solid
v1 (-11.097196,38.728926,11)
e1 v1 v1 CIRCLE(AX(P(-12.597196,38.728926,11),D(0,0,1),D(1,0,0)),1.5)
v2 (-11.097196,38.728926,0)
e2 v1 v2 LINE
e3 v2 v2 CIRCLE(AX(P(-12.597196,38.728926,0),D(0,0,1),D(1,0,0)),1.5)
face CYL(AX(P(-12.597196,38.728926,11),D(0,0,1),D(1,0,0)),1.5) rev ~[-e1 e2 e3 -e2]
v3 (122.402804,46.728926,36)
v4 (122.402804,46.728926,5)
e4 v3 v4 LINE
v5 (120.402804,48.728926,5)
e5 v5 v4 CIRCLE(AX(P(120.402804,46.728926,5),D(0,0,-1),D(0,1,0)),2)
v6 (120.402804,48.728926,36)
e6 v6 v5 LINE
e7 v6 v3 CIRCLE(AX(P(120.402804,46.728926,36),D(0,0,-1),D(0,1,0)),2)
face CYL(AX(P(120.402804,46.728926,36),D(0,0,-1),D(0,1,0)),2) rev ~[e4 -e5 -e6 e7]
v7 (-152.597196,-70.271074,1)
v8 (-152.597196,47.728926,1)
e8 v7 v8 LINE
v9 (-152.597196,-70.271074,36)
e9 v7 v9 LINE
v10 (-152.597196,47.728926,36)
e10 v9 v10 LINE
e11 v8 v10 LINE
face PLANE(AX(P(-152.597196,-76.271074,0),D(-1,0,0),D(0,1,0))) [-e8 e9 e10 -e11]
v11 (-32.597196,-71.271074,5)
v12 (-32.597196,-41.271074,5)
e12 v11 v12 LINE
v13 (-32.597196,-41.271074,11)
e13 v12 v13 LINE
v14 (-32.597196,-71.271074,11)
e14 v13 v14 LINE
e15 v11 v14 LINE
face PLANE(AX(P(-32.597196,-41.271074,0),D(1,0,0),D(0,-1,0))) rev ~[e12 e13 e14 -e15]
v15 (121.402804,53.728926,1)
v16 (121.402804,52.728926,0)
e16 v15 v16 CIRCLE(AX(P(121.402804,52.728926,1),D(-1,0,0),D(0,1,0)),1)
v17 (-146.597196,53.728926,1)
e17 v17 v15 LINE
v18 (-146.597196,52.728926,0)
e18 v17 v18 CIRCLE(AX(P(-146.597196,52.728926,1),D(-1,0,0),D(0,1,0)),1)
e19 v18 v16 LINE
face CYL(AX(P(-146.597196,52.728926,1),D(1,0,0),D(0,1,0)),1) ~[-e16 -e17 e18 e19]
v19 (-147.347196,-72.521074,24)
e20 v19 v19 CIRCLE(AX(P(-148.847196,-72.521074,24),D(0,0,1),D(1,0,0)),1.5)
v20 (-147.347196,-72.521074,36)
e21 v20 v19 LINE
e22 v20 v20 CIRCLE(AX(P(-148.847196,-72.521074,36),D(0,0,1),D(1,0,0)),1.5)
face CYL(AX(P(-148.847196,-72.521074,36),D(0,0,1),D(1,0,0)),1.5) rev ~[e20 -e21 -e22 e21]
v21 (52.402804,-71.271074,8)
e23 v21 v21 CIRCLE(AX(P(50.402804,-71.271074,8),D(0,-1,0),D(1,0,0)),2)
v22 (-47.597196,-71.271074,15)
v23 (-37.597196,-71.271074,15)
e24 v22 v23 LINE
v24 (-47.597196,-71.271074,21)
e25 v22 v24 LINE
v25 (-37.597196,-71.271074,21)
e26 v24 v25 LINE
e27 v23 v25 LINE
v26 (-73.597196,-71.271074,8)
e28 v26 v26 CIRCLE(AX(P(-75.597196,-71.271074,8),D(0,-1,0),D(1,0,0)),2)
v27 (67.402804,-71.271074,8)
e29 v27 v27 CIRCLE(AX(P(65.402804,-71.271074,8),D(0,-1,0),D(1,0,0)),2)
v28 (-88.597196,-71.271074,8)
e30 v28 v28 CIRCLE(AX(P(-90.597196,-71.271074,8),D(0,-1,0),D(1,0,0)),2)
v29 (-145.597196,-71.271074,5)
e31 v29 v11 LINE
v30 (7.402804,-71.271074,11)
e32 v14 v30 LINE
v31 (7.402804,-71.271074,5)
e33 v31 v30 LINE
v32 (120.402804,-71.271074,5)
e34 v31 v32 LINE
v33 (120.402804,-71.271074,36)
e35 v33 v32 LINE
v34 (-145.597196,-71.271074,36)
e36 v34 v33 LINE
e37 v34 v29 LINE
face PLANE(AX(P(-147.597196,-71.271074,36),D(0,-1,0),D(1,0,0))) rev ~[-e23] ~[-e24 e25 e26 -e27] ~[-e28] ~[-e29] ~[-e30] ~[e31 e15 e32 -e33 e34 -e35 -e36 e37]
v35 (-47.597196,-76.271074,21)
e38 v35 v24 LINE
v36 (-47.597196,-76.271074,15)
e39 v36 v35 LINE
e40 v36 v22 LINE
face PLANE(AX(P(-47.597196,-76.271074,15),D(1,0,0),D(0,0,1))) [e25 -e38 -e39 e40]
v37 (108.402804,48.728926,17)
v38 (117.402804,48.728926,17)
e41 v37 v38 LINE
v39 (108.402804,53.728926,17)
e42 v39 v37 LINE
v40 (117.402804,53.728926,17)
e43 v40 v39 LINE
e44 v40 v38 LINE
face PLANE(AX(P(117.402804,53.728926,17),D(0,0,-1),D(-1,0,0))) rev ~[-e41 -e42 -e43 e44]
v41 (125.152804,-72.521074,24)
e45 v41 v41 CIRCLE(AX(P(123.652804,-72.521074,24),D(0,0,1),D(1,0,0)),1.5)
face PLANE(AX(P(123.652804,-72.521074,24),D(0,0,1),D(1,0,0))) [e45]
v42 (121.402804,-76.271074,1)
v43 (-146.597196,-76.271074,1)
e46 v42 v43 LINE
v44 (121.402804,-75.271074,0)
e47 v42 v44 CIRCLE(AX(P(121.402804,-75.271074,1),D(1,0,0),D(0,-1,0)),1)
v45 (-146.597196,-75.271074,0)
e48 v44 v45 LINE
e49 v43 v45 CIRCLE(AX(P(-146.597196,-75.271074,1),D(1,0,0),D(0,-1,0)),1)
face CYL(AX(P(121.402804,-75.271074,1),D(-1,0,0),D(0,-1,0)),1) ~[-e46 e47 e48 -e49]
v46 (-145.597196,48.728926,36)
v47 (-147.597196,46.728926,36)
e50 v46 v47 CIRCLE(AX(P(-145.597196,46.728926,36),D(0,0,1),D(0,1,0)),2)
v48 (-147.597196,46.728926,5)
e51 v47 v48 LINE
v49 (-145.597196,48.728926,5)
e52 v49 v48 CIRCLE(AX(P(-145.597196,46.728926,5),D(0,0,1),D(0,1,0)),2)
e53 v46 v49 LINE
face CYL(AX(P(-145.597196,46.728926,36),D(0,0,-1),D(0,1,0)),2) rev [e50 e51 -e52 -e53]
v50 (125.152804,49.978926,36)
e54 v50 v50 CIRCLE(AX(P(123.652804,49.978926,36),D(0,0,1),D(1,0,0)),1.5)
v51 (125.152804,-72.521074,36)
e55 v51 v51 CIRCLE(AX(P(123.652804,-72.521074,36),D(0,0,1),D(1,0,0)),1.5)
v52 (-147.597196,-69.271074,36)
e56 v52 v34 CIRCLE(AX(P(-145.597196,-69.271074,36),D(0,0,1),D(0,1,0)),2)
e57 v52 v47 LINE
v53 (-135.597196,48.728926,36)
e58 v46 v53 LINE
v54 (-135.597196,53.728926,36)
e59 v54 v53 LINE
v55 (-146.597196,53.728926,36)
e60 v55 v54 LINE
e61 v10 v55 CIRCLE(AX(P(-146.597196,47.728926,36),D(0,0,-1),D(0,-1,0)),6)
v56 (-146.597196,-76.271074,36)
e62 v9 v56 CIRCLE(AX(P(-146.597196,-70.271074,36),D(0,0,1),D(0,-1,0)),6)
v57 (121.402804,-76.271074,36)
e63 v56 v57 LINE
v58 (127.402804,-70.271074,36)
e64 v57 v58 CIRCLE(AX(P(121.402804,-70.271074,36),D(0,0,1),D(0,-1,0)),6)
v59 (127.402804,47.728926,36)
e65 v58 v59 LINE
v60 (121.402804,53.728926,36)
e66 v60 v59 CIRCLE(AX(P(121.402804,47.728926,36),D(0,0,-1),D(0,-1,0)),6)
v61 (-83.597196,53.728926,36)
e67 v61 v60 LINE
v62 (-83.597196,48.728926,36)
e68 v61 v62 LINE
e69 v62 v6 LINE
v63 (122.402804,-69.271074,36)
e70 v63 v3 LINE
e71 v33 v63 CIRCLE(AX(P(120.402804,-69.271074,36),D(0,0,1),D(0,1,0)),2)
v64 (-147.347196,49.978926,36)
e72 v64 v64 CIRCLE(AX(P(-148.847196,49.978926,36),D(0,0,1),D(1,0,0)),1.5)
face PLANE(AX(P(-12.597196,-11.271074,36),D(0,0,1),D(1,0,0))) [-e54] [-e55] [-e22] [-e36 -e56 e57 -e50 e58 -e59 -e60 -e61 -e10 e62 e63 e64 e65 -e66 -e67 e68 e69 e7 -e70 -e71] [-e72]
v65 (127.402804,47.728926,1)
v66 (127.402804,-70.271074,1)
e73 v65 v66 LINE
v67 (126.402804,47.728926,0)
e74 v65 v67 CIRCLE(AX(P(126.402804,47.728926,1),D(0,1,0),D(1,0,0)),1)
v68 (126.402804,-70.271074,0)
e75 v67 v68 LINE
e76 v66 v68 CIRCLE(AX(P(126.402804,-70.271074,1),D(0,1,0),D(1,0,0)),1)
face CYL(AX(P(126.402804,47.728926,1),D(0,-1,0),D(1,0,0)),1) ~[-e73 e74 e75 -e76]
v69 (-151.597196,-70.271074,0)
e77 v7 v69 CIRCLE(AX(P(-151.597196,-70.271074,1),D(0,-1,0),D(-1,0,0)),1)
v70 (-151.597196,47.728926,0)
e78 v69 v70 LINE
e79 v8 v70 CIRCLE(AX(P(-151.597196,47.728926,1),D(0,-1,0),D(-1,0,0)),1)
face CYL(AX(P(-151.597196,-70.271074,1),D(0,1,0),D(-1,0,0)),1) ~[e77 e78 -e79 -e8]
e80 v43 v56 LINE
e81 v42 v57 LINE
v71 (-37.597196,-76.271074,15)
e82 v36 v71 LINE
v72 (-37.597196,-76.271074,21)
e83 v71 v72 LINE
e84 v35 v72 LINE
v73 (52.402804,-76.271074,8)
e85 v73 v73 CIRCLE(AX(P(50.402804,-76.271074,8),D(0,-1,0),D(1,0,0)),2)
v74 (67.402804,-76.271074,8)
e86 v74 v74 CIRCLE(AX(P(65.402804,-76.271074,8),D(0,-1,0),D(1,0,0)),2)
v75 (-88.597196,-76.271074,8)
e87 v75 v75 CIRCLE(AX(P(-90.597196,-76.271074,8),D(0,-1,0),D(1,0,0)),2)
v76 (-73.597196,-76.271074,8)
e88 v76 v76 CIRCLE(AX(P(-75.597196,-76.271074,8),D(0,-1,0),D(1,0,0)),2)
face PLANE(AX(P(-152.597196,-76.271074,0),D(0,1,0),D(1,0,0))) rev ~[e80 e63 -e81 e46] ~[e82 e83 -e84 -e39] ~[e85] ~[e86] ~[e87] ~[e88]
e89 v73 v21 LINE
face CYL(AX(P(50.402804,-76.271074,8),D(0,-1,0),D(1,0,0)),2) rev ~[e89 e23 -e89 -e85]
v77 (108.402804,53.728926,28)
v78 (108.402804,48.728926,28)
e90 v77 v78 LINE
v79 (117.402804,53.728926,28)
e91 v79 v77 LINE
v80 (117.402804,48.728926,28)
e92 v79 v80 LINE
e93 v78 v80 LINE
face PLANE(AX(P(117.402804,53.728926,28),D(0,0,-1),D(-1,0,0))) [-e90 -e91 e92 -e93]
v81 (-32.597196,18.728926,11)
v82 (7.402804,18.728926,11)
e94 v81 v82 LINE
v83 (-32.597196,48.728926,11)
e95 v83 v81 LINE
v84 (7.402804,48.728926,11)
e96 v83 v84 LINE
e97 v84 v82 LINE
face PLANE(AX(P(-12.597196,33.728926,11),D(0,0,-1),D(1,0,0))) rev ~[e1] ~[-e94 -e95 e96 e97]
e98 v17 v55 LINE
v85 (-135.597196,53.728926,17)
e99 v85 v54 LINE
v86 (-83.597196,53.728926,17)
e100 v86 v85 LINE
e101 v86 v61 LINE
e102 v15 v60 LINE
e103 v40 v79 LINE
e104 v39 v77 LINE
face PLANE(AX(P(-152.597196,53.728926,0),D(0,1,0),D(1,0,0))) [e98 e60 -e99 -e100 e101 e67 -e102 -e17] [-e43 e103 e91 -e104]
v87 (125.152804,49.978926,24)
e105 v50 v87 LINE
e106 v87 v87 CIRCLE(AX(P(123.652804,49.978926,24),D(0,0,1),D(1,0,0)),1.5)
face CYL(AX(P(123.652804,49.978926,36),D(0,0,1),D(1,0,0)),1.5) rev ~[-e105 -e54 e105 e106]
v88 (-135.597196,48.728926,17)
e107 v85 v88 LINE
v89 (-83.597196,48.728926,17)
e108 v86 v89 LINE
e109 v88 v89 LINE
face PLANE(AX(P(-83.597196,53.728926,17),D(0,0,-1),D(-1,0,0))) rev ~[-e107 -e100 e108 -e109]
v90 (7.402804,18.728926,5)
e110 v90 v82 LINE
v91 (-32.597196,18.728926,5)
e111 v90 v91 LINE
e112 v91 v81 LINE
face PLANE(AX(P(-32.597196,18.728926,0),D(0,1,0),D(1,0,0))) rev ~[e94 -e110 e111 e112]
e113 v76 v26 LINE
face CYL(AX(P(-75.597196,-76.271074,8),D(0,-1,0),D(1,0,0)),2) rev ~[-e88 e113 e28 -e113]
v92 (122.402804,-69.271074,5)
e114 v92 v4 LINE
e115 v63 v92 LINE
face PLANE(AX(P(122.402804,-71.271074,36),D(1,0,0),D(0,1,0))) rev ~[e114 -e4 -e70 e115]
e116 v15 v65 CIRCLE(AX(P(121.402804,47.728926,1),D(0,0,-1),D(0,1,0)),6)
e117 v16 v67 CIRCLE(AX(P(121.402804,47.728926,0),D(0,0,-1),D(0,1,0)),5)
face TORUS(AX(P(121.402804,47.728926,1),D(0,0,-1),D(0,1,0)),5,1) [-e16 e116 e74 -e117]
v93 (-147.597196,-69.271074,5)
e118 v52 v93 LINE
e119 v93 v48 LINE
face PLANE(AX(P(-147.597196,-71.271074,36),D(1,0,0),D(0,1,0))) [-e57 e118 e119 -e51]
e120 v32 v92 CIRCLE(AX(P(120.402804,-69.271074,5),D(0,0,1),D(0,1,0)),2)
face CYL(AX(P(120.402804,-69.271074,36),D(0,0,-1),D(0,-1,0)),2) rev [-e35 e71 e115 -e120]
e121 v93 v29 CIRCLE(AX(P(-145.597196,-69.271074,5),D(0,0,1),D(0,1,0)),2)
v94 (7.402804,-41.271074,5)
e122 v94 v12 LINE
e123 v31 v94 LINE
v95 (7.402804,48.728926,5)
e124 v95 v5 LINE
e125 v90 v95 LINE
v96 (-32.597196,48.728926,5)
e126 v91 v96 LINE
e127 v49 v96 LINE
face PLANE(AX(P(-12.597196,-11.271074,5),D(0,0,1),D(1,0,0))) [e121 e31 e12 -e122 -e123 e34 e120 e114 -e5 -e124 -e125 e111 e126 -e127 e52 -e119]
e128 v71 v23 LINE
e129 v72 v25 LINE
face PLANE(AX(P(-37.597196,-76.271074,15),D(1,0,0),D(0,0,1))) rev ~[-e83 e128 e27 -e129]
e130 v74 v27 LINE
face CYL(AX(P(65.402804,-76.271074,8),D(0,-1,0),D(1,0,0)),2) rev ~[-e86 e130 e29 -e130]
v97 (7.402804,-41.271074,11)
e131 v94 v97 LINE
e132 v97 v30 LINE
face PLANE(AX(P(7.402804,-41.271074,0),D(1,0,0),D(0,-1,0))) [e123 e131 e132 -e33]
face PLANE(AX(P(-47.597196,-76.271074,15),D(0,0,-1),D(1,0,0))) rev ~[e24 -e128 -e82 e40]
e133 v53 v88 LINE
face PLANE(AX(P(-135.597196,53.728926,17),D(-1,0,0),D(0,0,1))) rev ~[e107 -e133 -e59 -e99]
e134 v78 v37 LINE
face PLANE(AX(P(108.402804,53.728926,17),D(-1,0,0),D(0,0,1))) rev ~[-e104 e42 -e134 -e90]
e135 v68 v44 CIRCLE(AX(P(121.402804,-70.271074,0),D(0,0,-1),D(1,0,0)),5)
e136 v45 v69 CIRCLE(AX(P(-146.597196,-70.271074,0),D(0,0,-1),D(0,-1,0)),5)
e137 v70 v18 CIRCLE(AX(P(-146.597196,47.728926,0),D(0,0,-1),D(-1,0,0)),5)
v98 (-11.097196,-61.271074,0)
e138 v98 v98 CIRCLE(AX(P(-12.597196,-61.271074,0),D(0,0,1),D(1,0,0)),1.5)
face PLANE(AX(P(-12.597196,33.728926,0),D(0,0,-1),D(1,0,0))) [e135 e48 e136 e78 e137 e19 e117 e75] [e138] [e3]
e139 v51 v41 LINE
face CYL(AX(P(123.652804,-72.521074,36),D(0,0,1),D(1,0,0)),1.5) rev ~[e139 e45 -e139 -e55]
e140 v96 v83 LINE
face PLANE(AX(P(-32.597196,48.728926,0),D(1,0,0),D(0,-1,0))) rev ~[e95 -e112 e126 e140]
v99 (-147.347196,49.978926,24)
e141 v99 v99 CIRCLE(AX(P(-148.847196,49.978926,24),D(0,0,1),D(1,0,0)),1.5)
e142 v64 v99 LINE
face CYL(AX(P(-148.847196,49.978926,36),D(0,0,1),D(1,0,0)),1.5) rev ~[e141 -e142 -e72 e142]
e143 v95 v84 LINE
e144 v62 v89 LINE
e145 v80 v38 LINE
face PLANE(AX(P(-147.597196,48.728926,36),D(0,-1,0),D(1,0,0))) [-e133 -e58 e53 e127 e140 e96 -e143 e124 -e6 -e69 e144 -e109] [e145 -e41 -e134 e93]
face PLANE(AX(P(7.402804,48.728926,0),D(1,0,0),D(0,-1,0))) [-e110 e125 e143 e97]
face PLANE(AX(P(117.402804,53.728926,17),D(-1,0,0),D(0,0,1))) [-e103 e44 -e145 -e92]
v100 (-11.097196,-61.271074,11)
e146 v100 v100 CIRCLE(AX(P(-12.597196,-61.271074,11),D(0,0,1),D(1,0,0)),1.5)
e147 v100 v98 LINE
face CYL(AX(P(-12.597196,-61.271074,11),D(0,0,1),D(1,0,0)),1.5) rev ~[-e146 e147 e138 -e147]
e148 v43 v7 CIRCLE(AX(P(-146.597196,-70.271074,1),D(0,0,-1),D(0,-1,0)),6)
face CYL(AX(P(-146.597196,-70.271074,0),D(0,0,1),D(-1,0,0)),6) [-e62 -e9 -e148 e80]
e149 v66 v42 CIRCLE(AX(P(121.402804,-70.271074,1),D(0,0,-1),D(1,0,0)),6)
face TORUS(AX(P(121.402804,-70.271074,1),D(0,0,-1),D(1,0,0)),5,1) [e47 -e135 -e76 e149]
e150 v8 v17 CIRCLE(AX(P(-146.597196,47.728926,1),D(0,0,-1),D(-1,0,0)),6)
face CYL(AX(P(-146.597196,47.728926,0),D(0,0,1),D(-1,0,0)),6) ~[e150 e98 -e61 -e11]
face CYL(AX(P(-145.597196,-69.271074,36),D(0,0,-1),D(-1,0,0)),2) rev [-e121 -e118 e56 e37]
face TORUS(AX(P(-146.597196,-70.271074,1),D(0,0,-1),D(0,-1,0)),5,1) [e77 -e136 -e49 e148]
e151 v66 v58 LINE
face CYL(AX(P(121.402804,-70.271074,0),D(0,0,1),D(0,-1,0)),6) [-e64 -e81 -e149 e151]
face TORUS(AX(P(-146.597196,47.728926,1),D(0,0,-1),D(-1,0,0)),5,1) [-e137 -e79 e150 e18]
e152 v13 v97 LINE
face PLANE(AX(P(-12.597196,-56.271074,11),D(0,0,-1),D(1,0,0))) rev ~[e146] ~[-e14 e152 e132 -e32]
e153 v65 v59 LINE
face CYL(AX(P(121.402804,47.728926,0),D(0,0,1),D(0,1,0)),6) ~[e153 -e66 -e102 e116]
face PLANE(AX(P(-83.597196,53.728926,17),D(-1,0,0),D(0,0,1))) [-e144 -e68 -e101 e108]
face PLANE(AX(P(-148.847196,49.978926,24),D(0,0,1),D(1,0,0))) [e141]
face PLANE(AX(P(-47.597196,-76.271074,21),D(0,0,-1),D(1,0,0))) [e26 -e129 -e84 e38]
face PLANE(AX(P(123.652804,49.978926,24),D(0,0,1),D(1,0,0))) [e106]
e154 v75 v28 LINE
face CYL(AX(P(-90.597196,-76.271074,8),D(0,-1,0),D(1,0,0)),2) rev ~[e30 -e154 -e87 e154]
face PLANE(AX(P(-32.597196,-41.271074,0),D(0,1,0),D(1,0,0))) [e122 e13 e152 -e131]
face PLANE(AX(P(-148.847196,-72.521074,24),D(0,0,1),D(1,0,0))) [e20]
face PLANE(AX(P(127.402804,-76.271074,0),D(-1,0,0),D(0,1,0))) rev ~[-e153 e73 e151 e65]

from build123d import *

# Parameters (mm, degrees)
F0_W      = 280
F0_H      = 130
F1_DEPTH  = 36
F2_W      = 270
F2_H      = 120
F3_DEPTH  = 31
F4_R      = 2
F4_W      = 10
F4_H      = 6
F6_DEPTH  = 25
F5_W      = 52
F5_H      = 19
F5_W_2    = 9
F5_H_2    = 11
F7_DEPTH  = 25
F8_W      = 40
F8_H      = 30
F9_DEPTH  = 11
F10_R     = 1.5
F11_DEPTH = 12
F12_R     = 1.5
F13_DEPTH = 12
F14_R     = 6
F15_R     = 2
F16_R     = 1


# Not quite as in the source:
# - a feature names something its author has since deleted; it is built from what else it names


with BuildPart() as f1:
    # F0 (on Top) → F1 (new body)
    with BuildSketch(Plane.XY):
        with Locations((-12.5971958935, -11.2710741152)):
            Rectangle(F0_W, F0_H)
    extrude(amount=F1_DEPTH)

    # F2 (on face) → F3 (cut)
    with BuildSketch(Plane.XY.offset(36)):
        with Locations((-12.5971958935, -11.2710741152)):
            Rectangle(F2_W, F2_H)
    extrude(amount=-F3_DEPTH, mode=Mode.SUBTRACT)

    # F4 (on face) → F6 (cut)
    with BuildSketch(Plane.XZ.offset(76.2710741152)):
        with Locations((-90.5971958935, 8)):
            Circle(F4_R)
        with Locations((-75.5971958935, 8)):
            Circle(F4_R)
        with Locations((50.4028041065, 8)):
            Circle(F4_R)
        with Locations((65.4028041065, 8)):
            Circle(F4_R)
        with Locations((-42.5971958935, 18)):
            Rectangle(F4_W, F4_H)
    extrude(amount=-F6_DEPTH, mode=Mode.SUBTRACT)

    # F5 (on face) → F7 (cut)
    with BuildSketch(Plane(origin=(0, 53.7289258848, 0), x_dir=(-1, 0, 0), z_dir=(0, 1, 0))):
        with Locations((109.5971958935, 26.5)):
            Rectangle(F5_W, F5_H)
        with Locations((-112.9028041065, 22.5)):
            Rectangle(F5_W_2, F5_H_2)
    extrude(amount=-F7_DEPTH, mode=Mode.SUBTRACT)

    # F8 (on face) → F9 (join)
    with BuildSketch(Plane(origin=(0, 0, 0), x_dir=(1, 0, 0), z_dir=(0, 0, -1))):
        with Locations((-12.5971958935, -33.7289258848)):
            Rectangle(F8_W, F8_H)
        with Locations((-12.5971958935, 56.2710741152)):
            Rectangle(F8_W, F8_H)
    extrude(amount=-F9_DEPTH)

    # F10 (on face) → F11 (cut)
    with BuildSketch(Plane.XY.offset(11)):
        with Locations((-12.5971958935, 38.7289258848)):
            Circle(F10_R)
        with Locations((-12.5971958935, -61.2710741152)):
            Circle(F10_R)
    extrude(amount=-F11_DEPTH, mode=Mode.SUBTRACT)

    # F12 (on face) → F13 (cut)
    with BuildSketch(Plane.XY.offset(36)):
        with Locations((-148.8471958935, 49.9789258848)):
            Circle(F12_R)
        with Locations((-148.8471958935, -72.5210741152)):
            Circle(F12_R)
        with Locations((123.6528041065, -72.5210741152)):
            Circle(F12_R)
        with Locations((123.6528041065, 49.9789258848)):
            Circle(F12_R)
    extrude(amount=-F13_DEPTH, mode=Mode.SUBTRACT)

    # F14
    f14_edges = [f1.edges().sort_by_distance(p)[0] for p in [
        (-152.597196, -76.271074, 18),
        (-152.597196, 53.728926, 18),
        (127.402804, -76.271074, 18),
        (127.402804, 53.728926, 18),
    ]]
    fillet(f14_edges, radius=F14_R)

    # F15
    f15_edges = [f1.edges().sort_by_distance(p)[0] for p in [
        (-147.597196, 48.728926, 20.5),
        (-147.597196, -71.271074, 20.5),
        (122.402804, 48.728926, 20.5),
        (122.402804, -71.271074, 20.5),
    ]]
    fillet(f15_edges, radius=F15_R)

    # F16
    f16_edges = [f1.edges().sort_by_distance(p)[0] for p in [
        (-152.597196, -11.271074, 0),
    ]]
    fillet(f16_edges, radius=F16_R)


solid = f1.part
